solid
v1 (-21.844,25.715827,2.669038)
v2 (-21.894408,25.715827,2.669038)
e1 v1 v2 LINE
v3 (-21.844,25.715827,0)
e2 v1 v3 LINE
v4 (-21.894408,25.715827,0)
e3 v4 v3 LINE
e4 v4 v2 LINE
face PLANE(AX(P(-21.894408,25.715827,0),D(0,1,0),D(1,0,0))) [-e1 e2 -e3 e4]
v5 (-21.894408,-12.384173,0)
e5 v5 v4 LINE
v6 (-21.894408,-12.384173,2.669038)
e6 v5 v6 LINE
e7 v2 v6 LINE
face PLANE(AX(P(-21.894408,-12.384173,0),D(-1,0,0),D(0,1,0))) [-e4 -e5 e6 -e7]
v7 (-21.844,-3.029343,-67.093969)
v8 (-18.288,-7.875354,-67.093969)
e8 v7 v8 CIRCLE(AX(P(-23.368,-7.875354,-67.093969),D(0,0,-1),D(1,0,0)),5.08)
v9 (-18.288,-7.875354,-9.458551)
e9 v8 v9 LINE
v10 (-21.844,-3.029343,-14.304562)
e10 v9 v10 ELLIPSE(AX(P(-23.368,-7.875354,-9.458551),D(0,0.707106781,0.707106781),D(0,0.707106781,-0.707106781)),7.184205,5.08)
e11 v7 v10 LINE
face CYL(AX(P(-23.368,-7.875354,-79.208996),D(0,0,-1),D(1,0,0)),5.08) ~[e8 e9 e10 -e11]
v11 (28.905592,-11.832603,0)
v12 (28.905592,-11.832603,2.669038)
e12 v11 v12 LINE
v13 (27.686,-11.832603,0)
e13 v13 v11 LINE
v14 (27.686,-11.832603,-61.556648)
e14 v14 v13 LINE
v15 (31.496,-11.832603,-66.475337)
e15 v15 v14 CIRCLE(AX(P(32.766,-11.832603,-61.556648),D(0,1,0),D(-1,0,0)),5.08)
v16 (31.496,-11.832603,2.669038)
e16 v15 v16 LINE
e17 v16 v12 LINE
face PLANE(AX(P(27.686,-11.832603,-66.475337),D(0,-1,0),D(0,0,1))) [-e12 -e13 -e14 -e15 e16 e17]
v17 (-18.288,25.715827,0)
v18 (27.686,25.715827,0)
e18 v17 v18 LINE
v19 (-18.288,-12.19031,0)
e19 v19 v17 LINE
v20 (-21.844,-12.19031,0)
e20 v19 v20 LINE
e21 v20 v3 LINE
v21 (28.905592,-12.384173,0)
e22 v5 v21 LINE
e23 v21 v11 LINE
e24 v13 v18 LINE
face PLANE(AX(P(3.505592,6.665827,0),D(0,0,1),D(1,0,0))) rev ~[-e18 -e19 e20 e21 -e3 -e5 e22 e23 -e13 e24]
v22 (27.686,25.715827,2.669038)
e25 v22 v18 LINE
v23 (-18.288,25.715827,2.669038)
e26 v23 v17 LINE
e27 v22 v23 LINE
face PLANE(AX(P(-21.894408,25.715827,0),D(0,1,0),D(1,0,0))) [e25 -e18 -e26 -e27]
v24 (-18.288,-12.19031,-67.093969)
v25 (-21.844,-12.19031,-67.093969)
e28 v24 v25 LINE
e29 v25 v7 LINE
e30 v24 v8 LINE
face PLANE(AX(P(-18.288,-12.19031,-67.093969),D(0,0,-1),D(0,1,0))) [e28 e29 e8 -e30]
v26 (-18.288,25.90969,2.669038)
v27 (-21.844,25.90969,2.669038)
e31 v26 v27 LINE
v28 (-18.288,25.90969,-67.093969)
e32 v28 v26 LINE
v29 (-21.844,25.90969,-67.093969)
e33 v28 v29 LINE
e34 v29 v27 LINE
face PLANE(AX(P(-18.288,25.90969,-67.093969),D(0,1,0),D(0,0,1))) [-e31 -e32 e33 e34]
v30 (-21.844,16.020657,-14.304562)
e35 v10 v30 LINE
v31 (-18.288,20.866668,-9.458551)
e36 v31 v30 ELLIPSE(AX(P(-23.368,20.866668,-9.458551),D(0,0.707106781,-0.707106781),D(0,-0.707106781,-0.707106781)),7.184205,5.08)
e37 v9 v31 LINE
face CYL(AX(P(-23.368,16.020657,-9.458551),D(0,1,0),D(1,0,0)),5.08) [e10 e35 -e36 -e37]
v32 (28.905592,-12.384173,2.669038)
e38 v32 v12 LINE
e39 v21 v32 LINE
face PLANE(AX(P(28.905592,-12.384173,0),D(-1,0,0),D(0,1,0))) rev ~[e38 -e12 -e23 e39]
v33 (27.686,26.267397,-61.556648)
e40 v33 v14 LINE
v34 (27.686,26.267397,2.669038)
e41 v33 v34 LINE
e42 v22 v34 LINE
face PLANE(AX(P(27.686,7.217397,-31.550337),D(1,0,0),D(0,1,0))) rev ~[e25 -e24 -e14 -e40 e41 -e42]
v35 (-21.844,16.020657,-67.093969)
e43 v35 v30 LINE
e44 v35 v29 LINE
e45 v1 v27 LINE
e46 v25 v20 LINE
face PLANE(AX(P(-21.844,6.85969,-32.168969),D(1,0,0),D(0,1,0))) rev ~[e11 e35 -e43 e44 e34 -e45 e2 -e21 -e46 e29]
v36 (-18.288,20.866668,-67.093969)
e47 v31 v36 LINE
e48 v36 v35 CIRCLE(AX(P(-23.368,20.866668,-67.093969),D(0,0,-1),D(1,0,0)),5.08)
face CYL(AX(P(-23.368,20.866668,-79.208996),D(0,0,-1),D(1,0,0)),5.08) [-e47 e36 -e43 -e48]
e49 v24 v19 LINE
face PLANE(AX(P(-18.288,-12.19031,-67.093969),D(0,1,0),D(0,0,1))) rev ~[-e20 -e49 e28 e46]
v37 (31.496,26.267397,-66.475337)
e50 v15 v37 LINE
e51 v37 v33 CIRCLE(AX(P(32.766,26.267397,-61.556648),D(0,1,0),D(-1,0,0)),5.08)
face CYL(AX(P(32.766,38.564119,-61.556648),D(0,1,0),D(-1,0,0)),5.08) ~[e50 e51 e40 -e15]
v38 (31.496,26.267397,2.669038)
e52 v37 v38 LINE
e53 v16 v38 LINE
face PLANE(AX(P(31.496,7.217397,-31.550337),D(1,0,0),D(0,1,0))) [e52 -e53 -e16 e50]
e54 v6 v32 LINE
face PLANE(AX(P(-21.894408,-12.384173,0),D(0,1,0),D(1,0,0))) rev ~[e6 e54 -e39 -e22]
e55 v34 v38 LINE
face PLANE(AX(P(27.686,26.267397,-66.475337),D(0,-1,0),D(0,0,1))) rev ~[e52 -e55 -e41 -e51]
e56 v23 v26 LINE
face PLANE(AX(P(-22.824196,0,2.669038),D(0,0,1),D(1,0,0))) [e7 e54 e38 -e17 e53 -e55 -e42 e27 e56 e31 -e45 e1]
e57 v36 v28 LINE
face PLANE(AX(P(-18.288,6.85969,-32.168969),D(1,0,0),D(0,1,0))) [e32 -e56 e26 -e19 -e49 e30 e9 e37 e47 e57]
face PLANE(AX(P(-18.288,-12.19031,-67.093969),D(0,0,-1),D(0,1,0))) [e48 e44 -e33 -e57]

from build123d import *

# Parameters (mm, degrees)
F0_W           = 50.8
F0_H           = 38.1
F1_DEPTH       = 3.175
F3_START       = -18.288
F2_W           = 38.1
F2_H           = 69.85
F3_DEPTH       = 3.556
F5_START       = 27.686
F4_W           = 38.1
F4_H           = 69.85
F5_DEPTH       = 3.81
F6_W           = 19.05
F6_H           = 53.975
F7_DEPTH       = 32.004
F8_T1_DEPTH    = 64.9044340938
F8_T3_DEPTH    = 19.05
F8_T5_DEPTH    = 62.6934442484
F8_T11_DEPTH   = 64.9044340938
F8_T15_DEPTH   = 31.165027858
F8_T23_DEPTH   = 31.165027858
F8_T28_DEPTH   = 64.9044340938
F9_W           = 54.9304988235
F9_H           = 1.4888443984
F10_DEPTH      = 28.4988
F10_DEPTH_BACK = 25.4


# Not quite as in the source:
# - a fillet or chamfer that OpenCascade refuses, or shapes differently, is made with other operations: its cross-section is extruded or revolved along the edge and cut away or added


with BuildPart() as f1:
    # F0 (on Top) → F1 (new body)
    with BuildSketch(Plane.XY):
        with Locations((3.5055922344, 6.6658267866)):
            Rectangle(F0_W, F0_H)
    extrude(amount=F1_DEPTH)

    # F2 (on Right) → F3 (join)
    with BuildSketch(Plane.YZ.offset(F3_START)):
        with Locations((6.8596902806, -32.1689685807)):
            Rectangle(F2_W, F2_H)
    extrude(amount=-F3_DEPTH)

    # F4 (on Right) → F5 (join)
    with BuildSketch(Plane.YZ.offset(F5_START)):
        with Locations((7.2173965164, -31.5503366292)):
            Rectangle(F4_W, F4_H)
    extrude(amount=F5_DEPTH)

    # F6 (on Right) → F7 (cut)
    with BuildSketch(Plane.YZ):
        with Locations((6.4956571441, -41.2920623448)):
            Rectangle(F6_W, F6_H)
    extrude(amount=-F7_DEPTH, mode=Mode.SUBTRACT)

    # F8: fillet of radius 5.08 on 4 edges, made by hand

    # F8_s2 → F8_t1 (cut)
    with BuildSketch(Plane.XY.offset(-79.2089964387)):
        with BuildLine():
            ThreePointArc((-18.288, 20.8666682873), (-19.2723730639, 17.8612997575), (-21.844, 16.0206571441))
            Line((-21.844, 16.0206571441), (-18.288, 16.0206571441))
            Line((-18.288, 16.0206571441), (-18.288, 20.8666682873))
        make_face()
        with BuildLine():
            ThreePointArc((-18.288, -7.8753539991), (-19.2723730639, -4.8699854693), (-21.844, -3.0293428559))
            Line((-21.844, -3.0293428559), (-18.288, -3.0293428559))
            Line((-18.288, -3.0293428559), (-18.288, -7.8753539991))
        make_face()
    extrude(amount=F8_T1_DEPTH, mode=Mode.SUBTRACT)

    # F8_s4 → F8_t3 (cut)
    with BuildSketch(Plane.XZ.offset(-16.0206571441)):
        with BuildLine():
            ThreePointArc((-18.288, -9.4585512016), (-19.2723730639, -12.4639197314), (-21.844, -14.3045623448))
            Line((-21.844, -14.3045623448), (-18.288, -14.3045623448))
            Line((-18.288, -14.3045623448), (-18.288, -9.4585512016))
        make_face()
    extrude(amount=F8_T3_DEPTH, mode=Mode.SUBTRACT)

    # F8_s6 → F8_t5 (cut)
    with BuildSketch(Plane.XZ.offset(-38.5641186406)):
        with BuildLine():
            ThreePointArc((27.686, -61.5566477795), (28.7499073716, -64.6674997528), (31.496, -66.4753366292))
            Line((31.496, -66.4753366292), (27.686, -66.4753366292))
            Line((27.686, -66.4753366292), (27.686, -61.5566477795))
        make_face()
    extrude(amount=F8_T5_DEPTH, mode=Mode.SUBTRACT)


with BuildPart() as f8_tool9:
    # F8_s10 → F8_t11 (new body)
    with BuildSketch(Plane.XY.offset(-67.0939685807)):
        with BuildLine():
            ThreePointArc((-18.288, 20.8666682873), (-19.2723730639, 17.8612997575), (-21.844, 16.0206571441))
            Line((-21.844, 16.0206571441), (-18.288, 16.0206571441))
            Line((-18.288, 16.0206571441), (-18.288, 20.8666682873))
        make_face()
    extrude(amount=F8_T11_DEPTH)

    split(bisect_by=Plane.XY.offset(-14.3045623448), keep=Keep.TOP)


with BuildPart() as f8_tool13:
    # F8_s14 → F8_t15 (new body)
    with BuildSketch(Plane.XZ.offset(-28.1356850021)):
        with BuildLine():
            ThreePointArc((-18.288, -9.4585512016), (-19.2723730639, -12.4639197314), (-21.844, -14.3045623448))
            Line((-21.844, -14.3045623448), (-18.288, -14.3045623448))
            Line((-18.288, -14.3045623448), (-18.288, -9.4585512016))
        make_face()
    extrude(amount=F8_T15_DEPTH)

    split(bisect_by=Plane.XZ.offset(-25.9096902806), keep=Keep.TOP)

    split(bisect_by=Plane.XZ.offset(-16.0206571441), keep=Keep.BOTTOM)


with BuildPart() as f8_tool9_1:
    add(f8_tool9.part)

    # F8_t18: intersect F8_tool13
    add(f8_tool13.part, mode=Mode.INTERSECT)


with BuildPart() as f1_1:
    add(f1.part)

    # F8_t7: cut F8_tool9
    add(f8_tool9_1.part, mode=Mode.SUBTRACT)


with BuildPart() as f8_tool21:
    # F8_s22 → F8_t23 (new body)
    with BuildSketch(Plane.XZ.offset(-16.0206571441)):
        with BuildLine():
            ThreePointArc((-18.288, -9.4585512016), (-19.2723730639, -12.4639197314), (-21.844, -14.3045623448))
            Line((-21.844, -14.3045623448), (-18.288, -14.3045623448))
            Line((-18.288, -14.3045623448), (-18.288, -9.4585512016))
        make_face()
    extrude(amount=F8_T23_DEPTH)

    split(bisect_by=Plane.XZ.offset(12.1903097194), keep=Keep.BOTTOM)

    split(bisect_by=Plane.XZ.offset(3.0293428559), keep=Keep.TOP)


with BuildPart() as f8_tool26:
    # F8_s27 → F8_t28 (new body)
    with BuildSketch(Plane.XY.offset(-2.1895344868)):
        with BuildLine():
            ThreePointArc((-18.288, -7.8753539991), (-19.2723730639, -4.8699854693), (-21.844, -3.0293428559))
            Line((-21.844, -3.0293428559), (-18.288, -3.0293428559))
            Line((-18.288, -3.0293428559), (-18.288, -7.8753539991))
        make_face()
    extrude(amount=-F8_T28_DEPTH)

    split(bisect_by=Plane.XY.offset(-14.3045623448), keep=Keep.TOP)


with BuildPart() as f8_tool21_1:
    add(f8_tool21.part)

    # F8_t30: intersect F8_tool26
    add(f8_tool26.part, mode=Mode.INTERSECT)


with BuildPart() as f1_2:
    add(f1_1.part)

    # F8_t19: cut F8_tool21
    add(f8_tool21_1.part, mode=Mode.SUBTRACT)

    # F9 (on Front) → F10 (cut, two sides)
    with BuildSketch(Plane.XZ) as f10_sk:
        with Locations((4.6410532668, 3.4134599846)):
            Rectangle(F9_W, F9_H)
    extrude(amount=-F10_DEPTH, mode=Mode.SUBTRACT)
    extrude(f10_sk.sketch, amount=F10_DEPTH_BACK, mode=Mode.SUBTRACT)


solid = f1_2.part
